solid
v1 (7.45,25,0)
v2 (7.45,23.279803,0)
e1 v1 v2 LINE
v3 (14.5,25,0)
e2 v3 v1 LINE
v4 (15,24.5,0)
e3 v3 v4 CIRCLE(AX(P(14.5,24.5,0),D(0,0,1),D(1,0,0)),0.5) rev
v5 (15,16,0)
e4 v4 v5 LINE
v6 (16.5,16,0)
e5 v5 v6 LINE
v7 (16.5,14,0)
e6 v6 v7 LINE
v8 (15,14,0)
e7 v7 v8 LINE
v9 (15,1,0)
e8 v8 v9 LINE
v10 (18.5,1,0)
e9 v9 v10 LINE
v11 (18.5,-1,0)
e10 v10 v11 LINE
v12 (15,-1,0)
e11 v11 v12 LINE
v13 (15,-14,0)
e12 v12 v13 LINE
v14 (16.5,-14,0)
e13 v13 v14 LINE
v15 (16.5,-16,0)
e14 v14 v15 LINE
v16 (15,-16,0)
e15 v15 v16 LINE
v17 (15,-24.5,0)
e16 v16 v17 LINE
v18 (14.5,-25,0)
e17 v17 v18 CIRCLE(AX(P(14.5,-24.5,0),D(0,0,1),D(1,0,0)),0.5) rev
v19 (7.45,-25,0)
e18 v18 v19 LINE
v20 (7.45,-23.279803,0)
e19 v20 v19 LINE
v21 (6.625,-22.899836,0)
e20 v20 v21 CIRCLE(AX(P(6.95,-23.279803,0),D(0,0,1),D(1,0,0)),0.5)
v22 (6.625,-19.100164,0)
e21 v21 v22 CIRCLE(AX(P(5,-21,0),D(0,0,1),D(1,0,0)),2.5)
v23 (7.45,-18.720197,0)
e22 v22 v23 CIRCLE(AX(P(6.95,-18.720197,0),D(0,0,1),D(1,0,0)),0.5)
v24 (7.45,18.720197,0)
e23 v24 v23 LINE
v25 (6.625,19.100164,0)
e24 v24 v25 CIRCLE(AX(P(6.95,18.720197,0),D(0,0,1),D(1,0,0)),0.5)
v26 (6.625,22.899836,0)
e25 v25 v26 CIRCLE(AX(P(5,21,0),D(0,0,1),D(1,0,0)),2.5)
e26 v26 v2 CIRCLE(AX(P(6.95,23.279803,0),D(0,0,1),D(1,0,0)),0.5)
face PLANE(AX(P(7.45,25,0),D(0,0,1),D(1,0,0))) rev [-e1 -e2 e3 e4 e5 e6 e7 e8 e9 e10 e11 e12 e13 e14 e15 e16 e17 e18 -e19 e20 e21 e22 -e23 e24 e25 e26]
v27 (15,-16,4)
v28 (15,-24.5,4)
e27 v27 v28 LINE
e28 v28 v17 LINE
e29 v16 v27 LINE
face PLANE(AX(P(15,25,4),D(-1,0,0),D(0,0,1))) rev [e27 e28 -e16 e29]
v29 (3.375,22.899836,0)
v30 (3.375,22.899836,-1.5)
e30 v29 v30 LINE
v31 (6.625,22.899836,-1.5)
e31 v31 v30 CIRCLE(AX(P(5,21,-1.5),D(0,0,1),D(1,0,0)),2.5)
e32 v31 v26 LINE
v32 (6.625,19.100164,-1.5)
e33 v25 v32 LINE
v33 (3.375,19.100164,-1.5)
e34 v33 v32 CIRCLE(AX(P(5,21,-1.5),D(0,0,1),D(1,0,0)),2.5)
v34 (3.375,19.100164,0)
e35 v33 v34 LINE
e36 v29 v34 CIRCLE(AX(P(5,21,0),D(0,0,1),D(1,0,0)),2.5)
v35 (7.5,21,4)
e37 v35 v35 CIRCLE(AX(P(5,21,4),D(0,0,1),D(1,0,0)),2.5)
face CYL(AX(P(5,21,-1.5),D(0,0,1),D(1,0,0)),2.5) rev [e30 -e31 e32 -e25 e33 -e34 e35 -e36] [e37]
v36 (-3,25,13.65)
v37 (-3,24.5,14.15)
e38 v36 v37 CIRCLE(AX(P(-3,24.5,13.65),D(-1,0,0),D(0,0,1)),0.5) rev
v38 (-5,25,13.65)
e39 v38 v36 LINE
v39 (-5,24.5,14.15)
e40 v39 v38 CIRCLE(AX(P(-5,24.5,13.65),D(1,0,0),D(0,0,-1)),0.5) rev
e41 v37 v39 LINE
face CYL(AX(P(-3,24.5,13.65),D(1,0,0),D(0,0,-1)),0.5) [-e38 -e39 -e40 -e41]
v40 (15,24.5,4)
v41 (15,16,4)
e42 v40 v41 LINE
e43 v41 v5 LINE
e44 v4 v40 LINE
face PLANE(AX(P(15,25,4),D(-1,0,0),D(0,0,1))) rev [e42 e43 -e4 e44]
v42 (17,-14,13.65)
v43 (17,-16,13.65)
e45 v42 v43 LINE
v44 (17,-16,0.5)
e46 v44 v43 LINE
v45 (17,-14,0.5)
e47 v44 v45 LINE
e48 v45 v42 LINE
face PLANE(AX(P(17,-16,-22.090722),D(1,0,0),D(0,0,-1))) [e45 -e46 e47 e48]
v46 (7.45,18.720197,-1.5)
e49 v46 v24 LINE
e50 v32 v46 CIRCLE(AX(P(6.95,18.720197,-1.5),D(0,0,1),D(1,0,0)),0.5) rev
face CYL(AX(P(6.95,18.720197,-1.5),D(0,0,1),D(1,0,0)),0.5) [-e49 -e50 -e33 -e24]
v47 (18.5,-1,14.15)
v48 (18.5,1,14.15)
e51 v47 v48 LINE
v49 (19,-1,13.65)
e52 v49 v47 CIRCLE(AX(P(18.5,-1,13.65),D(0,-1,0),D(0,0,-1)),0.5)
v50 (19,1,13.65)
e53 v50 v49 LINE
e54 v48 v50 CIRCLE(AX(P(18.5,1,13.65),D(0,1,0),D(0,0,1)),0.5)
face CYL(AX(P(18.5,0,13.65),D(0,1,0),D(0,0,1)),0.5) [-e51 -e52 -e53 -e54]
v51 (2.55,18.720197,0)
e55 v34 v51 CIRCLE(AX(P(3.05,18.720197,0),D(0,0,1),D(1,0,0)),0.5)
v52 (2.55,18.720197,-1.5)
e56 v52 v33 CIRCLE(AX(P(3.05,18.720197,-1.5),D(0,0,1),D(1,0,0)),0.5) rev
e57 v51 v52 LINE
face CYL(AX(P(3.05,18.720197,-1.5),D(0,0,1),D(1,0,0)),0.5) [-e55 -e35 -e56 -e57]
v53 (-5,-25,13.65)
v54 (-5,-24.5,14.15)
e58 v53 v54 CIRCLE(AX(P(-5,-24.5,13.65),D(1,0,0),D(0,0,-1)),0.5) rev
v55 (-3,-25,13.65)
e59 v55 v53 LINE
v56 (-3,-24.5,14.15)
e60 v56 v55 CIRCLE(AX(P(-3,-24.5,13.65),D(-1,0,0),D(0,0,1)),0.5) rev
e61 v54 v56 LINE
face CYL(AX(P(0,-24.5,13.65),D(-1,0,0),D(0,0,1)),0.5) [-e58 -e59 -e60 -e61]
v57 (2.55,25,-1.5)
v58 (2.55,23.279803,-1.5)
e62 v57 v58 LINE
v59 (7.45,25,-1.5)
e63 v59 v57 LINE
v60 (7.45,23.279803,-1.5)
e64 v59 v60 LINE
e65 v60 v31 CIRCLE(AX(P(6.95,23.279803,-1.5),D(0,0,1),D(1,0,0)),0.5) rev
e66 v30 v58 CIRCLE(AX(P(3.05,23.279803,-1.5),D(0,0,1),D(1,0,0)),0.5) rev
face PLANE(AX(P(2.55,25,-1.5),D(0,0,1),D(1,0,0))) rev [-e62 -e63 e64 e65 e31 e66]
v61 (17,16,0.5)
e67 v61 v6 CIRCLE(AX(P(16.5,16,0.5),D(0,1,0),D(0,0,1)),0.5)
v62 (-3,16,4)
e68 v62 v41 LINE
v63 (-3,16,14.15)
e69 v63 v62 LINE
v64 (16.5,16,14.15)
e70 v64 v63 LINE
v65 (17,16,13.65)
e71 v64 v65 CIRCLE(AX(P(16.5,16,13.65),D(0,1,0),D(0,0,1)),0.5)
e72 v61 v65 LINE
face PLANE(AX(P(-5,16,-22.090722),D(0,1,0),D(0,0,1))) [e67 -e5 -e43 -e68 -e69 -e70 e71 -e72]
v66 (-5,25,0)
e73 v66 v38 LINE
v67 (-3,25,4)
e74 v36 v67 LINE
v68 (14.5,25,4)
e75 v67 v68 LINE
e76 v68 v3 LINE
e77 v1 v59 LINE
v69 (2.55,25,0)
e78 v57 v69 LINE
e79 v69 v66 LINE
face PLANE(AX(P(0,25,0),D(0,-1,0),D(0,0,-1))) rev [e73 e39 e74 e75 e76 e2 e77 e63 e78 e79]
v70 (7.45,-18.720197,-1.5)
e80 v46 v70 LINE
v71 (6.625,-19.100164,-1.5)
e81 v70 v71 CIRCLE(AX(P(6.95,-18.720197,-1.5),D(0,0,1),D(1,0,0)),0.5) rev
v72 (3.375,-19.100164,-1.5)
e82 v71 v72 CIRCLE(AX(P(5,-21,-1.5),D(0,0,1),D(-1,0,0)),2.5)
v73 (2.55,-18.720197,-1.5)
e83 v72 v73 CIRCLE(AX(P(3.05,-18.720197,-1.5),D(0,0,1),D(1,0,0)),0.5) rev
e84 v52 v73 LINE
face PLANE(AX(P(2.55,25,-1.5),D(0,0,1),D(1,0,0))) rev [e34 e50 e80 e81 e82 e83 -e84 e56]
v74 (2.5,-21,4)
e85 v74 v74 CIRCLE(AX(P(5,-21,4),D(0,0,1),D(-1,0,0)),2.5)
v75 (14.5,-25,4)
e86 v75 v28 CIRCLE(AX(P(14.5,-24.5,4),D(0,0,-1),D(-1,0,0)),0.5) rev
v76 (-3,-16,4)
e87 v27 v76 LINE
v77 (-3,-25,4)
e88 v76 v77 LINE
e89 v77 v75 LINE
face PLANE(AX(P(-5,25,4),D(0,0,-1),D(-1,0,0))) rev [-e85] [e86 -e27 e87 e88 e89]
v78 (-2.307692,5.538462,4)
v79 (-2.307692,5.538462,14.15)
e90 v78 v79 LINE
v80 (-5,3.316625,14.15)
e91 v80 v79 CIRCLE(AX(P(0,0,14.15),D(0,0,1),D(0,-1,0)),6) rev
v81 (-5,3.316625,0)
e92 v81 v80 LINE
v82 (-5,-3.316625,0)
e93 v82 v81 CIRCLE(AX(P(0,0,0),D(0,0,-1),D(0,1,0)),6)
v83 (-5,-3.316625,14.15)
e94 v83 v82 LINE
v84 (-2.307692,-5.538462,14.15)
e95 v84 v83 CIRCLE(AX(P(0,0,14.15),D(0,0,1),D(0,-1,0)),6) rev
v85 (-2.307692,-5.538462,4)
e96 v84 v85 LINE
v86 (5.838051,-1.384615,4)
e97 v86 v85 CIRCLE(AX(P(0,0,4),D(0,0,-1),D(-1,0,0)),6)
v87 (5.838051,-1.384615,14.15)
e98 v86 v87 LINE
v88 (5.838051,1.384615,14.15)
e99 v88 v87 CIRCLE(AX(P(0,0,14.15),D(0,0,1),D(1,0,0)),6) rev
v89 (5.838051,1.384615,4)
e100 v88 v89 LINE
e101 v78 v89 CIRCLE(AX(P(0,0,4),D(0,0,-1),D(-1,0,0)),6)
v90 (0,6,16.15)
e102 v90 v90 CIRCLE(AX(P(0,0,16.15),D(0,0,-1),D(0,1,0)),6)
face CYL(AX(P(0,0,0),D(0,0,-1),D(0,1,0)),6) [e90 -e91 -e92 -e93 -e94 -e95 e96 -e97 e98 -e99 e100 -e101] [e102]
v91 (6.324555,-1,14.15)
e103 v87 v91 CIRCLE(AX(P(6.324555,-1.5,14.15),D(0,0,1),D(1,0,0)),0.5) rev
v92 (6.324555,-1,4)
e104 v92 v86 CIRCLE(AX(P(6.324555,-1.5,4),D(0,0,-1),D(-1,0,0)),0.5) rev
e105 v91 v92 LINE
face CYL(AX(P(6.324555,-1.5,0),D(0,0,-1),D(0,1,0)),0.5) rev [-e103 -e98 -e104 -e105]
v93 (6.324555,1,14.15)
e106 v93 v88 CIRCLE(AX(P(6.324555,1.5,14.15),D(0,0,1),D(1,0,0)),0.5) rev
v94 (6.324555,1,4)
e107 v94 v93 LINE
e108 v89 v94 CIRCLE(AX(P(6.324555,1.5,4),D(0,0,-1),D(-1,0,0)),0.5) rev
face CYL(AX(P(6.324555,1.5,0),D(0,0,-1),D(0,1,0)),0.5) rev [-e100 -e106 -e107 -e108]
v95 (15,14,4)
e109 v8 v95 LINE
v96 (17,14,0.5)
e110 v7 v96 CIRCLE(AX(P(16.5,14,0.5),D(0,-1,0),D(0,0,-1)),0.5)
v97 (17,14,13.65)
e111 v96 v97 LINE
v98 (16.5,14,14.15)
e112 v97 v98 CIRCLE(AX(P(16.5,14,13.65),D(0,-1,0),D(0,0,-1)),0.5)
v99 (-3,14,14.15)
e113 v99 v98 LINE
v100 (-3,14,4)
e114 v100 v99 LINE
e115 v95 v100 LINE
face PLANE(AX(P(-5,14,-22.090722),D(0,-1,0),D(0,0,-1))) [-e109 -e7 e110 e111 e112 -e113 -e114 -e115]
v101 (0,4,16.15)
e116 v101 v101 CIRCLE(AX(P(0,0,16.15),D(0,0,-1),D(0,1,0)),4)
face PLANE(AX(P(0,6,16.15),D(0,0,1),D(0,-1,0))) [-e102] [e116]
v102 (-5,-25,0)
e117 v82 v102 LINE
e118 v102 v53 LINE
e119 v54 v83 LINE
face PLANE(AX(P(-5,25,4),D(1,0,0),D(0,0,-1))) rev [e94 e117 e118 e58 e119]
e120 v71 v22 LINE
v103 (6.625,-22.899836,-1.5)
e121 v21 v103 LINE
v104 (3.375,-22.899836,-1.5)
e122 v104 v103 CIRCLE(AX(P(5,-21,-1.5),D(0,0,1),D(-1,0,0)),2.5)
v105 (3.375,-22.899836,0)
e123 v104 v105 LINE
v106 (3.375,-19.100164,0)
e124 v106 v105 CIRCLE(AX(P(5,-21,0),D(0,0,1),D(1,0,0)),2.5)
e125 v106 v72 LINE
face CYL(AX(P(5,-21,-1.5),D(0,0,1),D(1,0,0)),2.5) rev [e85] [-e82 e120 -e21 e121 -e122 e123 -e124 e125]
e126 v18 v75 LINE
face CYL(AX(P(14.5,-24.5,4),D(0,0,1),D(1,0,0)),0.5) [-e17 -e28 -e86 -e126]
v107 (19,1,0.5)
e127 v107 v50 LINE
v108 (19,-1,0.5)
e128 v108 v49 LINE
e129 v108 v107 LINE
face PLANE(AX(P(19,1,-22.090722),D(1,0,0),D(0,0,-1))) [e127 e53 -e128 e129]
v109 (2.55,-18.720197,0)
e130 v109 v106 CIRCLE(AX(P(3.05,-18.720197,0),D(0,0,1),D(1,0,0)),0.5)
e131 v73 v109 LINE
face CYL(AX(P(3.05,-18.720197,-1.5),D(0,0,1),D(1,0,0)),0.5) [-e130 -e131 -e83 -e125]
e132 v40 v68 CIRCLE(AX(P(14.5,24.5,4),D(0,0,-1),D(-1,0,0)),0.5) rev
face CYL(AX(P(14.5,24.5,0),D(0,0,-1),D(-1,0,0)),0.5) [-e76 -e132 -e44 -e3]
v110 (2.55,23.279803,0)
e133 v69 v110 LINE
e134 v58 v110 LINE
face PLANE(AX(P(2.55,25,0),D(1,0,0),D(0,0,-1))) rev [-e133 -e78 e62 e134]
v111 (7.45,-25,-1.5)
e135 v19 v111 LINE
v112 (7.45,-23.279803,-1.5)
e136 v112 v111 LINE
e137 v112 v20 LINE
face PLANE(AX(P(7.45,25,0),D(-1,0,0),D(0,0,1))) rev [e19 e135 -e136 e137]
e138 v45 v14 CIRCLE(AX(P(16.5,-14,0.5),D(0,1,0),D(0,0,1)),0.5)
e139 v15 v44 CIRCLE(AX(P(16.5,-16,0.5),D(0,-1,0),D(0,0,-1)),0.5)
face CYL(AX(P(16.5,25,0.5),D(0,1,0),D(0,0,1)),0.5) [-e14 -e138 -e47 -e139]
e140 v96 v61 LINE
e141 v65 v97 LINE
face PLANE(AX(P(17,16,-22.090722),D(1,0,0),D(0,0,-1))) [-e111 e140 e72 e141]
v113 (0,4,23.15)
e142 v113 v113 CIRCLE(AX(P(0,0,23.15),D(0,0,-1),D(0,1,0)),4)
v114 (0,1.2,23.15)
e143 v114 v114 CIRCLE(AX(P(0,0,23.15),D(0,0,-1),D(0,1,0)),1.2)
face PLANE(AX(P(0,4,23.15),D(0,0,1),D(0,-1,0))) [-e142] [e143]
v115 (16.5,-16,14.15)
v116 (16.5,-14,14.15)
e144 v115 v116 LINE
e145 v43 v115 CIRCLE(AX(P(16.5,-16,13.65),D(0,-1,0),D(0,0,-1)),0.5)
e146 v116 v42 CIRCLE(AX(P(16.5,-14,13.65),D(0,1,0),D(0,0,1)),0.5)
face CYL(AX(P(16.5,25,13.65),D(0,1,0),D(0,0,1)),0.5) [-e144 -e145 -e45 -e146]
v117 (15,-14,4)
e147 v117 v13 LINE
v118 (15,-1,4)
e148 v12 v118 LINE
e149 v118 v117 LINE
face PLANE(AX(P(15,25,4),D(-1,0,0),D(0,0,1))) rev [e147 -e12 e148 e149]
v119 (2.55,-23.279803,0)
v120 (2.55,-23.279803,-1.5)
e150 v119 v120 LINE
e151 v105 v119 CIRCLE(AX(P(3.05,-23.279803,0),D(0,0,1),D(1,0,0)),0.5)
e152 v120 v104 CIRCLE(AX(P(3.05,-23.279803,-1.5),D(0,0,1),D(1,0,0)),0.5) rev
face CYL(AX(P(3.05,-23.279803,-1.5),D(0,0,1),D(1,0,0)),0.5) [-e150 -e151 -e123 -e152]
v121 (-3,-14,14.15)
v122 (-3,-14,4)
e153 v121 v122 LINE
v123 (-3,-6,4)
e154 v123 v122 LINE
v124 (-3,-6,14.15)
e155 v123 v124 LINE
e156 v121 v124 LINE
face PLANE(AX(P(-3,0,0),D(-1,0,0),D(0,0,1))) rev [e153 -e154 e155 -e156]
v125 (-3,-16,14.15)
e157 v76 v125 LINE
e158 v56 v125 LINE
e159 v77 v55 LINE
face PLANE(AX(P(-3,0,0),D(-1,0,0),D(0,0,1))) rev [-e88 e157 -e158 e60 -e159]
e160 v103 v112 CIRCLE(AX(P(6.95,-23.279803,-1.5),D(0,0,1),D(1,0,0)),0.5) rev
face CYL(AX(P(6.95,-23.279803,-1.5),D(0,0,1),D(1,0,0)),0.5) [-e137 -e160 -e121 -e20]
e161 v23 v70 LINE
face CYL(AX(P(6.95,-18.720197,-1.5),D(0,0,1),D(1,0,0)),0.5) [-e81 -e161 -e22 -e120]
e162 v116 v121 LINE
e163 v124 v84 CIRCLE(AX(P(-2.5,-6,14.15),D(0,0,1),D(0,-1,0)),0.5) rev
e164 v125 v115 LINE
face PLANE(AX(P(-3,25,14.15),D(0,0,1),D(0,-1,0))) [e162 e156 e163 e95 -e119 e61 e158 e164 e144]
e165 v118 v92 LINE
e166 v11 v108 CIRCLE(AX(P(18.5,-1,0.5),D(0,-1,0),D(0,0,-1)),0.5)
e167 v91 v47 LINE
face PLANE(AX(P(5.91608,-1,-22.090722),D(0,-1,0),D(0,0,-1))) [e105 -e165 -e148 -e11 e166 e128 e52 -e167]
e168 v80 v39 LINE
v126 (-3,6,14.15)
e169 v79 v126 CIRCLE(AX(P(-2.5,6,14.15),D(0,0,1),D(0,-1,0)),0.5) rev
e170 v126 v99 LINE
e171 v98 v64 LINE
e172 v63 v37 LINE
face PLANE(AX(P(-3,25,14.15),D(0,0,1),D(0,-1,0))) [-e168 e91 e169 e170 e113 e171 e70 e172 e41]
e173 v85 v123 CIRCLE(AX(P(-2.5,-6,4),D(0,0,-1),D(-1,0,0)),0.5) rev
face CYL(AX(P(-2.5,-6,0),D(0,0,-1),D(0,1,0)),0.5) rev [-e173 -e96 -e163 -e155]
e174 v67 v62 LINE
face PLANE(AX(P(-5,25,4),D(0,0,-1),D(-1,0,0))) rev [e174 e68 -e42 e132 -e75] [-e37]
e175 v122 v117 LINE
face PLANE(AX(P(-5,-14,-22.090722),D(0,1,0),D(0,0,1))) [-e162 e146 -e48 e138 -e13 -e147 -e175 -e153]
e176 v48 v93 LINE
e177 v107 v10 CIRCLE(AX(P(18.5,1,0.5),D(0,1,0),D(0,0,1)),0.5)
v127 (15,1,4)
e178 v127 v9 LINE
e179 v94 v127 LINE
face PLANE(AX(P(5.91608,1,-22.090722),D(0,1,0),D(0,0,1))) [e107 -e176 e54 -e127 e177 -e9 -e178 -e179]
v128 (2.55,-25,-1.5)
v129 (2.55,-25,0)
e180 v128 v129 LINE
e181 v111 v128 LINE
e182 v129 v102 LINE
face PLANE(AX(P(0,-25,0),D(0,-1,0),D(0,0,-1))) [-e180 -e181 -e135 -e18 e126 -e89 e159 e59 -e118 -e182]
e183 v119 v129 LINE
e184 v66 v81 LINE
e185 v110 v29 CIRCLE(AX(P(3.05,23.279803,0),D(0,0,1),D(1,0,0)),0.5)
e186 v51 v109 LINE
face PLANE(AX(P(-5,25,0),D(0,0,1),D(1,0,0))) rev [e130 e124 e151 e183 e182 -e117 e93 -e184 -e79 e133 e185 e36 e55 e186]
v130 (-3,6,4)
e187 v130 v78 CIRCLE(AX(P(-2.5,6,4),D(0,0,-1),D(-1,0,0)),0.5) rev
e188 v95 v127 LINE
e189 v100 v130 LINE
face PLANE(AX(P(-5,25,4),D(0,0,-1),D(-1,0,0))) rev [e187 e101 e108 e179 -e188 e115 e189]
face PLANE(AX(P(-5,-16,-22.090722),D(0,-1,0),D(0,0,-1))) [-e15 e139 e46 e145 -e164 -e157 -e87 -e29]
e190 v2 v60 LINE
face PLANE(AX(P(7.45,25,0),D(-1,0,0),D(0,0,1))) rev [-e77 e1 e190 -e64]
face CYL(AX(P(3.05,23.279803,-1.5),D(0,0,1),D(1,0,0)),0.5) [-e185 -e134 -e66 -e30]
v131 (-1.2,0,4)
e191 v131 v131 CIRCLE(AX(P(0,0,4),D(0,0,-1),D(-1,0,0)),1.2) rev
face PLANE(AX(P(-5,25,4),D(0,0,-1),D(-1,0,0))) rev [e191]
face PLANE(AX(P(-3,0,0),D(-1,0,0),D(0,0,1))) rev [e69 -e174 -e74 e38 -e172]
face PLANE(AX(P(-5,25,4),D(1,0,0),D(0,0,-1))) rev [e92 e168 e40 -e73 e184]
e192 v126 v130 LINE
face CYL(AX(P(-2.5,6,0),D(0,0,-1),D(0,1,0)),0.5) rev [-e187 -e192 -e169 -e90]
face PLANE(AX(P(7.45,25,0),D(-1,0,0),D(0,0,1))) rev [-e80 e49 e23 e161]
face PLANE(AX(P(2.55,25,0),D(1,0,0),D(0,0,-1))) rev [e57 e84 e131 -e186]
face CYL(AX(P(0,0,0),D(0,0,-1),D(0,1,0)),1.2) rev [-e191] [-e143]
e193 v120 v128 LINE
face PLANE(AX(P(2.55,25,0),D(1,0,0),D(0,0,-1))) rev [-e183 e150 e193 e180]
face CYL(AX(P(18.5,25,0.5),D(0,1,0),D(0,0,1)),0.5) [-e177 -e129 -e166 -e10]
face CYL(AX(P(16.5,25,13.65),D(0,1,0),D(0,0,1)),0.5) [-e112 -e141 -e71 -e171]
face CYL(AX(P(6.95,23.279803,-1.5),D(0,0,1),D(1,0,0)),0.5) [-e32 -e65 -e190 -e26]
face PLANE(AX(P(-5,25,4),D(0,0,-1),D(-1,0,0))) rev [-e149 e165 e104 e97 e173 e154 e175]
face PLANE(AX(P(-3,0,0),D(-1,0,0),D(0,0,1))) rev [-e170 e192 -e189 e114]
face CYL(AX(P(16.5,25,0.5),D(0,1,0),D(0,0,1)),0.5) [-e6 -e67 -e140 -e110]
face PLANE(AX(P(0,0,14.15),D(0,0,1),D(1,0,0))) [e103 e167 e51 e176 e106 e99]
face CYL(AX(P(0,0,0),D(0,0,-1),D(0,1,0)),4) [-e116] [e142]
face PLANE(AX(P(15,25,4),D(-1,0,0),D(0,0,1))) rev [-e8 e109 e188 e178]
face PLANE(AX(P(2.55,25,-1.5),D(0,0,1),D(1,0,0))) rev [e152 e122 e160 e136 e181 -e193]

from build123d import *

# Parameters (mm, degrees)
BOSS_EXTRU_1_DEPTH      = 25
ESQUISSE5_W             = 10.15
ESQUISSE5_H             = 50
BOSS_EXTRU_2_DEPTH      = 2
BOSS_EXTRU_3_REACH      = 35.09
ESQUISSE6_W             = 22
ESQUISSE6_H             = 2
ESQUISSE6_W_2           = 13.083920217
ESQUISSE7_R             = 2.5
ENL_V_MAT_EXTRU_1_DEPTH = 37.779376014
CONG_1_R                = 0.5


with BuildPart() as part:
    # Esquisse1 → Boss.-Extru.1 (new, symmetric)
    with BuildSketch(Plane(origin=(0, 0, 0), x_dir=(1, 0, 0), z_dir=(0, 1, 0))):
        Polygon((7.45, 0), (15, 0), (15, -4), (-5, -4), (-5, 0), (2.55, 0), (2.55, 1.5), (7.45, 1.5), align=None)
    extrude(amount=BOSS_EXTRU_1_DEPTH, both=True)

    # Esquisse3 → Révolution1 (revolve)
    with BuildSketch(Plane(origin=(0, 0, 0), x_dir=(0, 0, -1), z_dir=(1, 0, 0))):
        Polygon((0, 6), (-16.15, 6), (-16.15, 4), (-23.15, 4), (-23.15, 1.2), (0, 1.2), align=None)
    revolve(axis=Axis((0, 0, 0), (0, 0, 1)))

    # Esquisse5 → Boss.-Extru.2 (add)
    with BuildSketch(Plane.ZY.offset(5)):
        with Locations((9.075, 0)):
            Rectangle(ESQUISSE5_W, ESQUISSE5_H)
    extrude(amount=-BOSS_EXTRU_2_DEPTH)

    # Boss.-Extru.3: up to this face of the body (flat: up to its plane)
    boss_extru_3_end = Plane(part.part.faces().sort_by_distance((11.225, 0, 0))[0])
    # Esquisse6 → Boss.-Extru.3 (add, up to the picked face)
    with BuildSketch(Plane.XY.offset(14.15), mode=Mode.PRIVATE) as boss_extru_3_sk1:
        with Locations((6, 15)):
            Rectangle(ESQUISSE6_W, ESQUISSE6_H)
    boss_extru_3_tool1 = split(extrude(boss_extru_3_sk1.sketch, amount=-BOSS_EXTRU_3_REACH, mode=Mode.PRIVATE), bisect_by=boss_extru_3_end, keep=Keep.BOTH, mode=Mode.PRIVATE)
    # Esquisse6 → Boss.-Extru.3 (add, up to the picked face)
    with BuildSketch(Plane.XY.offset(14.15), mode=Mode.PRIVATE) as boss_extru_3_sk2:
        with Locations((6, -15)):
            Rectangle(ESQUISSE6_W, ESQUISSE6_H)
    boss_extru_3_tool2 = split(extrude(boss_extru_3_sk2.sketch, amount=-BOSS_EXTRU_3_REACH, mode=Mode.PRIVATE), bisect_by=boss_extru_3_end, keep=Keep.BOTH, mode=Mode.PRIVATE)
    # Esquisse6 → Boss.-Extru.3 (add, up to the picked face)
    with BuildSketch(Plane.XY.offset(14.15), mode=Mode.PRIVATE) as boss_extru_3_sk3:
        with Locations((12.458039892, 0)):
            Rectangle(ESQUISSE6_W_2, ESQUISSE6_H)
    boss_extru_3_tool3 = split(extrude(boss_extru_3_sk3.sketch, amount=-BOSS_EXTRU_3_REACH, mode=Mode.PRIVATE), bisect_by=boss_extru_3_end, keep=Keep.BOTH, mode=Mode.PRIVATE)
    add(boss_extru_3_tool1.solids().sort_by(Axis((6, 15, 14.15), (0, 0, -1)))[0])
    add(boss_extru_3_tool2.solids().sort_by(Axis((6, -15, 14.15), (0, 0, -1)))[0])
    add(boss_extru_3_tool3.solids().sort_by(Axis((12.45804, 0, 14.15), (0, 0, -1)))[0])

    # Esquisse7 → Enlèv. mat.-Extru.1 (cut, through all)
    with BuildSketch(Plane.XY.offset(4)):
        with Locations((5, 21)):
            Circle(ESQUISSE7_R)
        with Locations(Location((5, -21, 0), (0, 0, 348.521659045))):
            Circle(ESQUISSE7_R)
    extrude(amount=-ENL_V_MAT_EXTRU_1_DEPTH, mode=Mode.SUBTRACT)

    # Congé1
    # the kernel refuses this fillet: 0.5 mm, written as the material it adds along each edge
    with BuildSketch(Plane(origin=(5.916079783, 1, 14.15), x_dir=(1, 0, 0), z_dir=(0, 0, -1))) as cong_1_piece_1:
        with BuildLine():
            CenterArc((0.408475537, -0.5), CONG_1_R, 90, 76.657636203)
            ThreePointArc((-0.078028718, -0.384615385), (-0.035868882, -0.19294583), (0, 0))
            Line((0, 0), (0.408475537, 0))
        make_face()
    extrude(amount=11.171188843)
    with BuildSketch(Plane(origin=(5.916079783, -1, 14.15), x_dir=(1, 0, 0), z_dir=(0, 0, -1))) as cong_1_piece_2:
        with BuildLine():
            CenterArc((0.408475537, 0.5), CONG_1_R, 193.342363797, 76.657636203)
            ThreePointArc((-0.078028718, 0.384615385), (-0.035868882, 0.19294583), (0, 0))
            Line((0, 0), (0.408475537, 0))
        make_face()
    extrude(amount=11.171188843)
    with BuildSketch(Plane(origin=(-3, -5.196152423, 1.990381057), x_dir=(0.8964096085841841, -0.44322659401027603, 0), z_dir=(0, 0, 1))) as cong_1_piece_3:
        with BuildLine():
            CenterArc((0.804491428, -0.498963395), CONG_1_R, 93.690067526, 112.619864948)
            Line((0.356286624, -0.720576692), (0, 0))
            ThreePointArc((0, 0), (0.386155885, -0.012439259), (0.772311771, 0))
        make_face()
    extrude(amount=12.159618943)
    with BuildSketch(Plane(origin=(-3, 5.196152423, 1.990381057), x_dir=(0, 1, 0), z_dir=(0, 0, 1))) as cong_1_piece_4:
        with BuildLine():
            CenterArc((0.803847577, -0.5), CONG_1_R, 90, 112.619864948)
            ThreePointArc((0.342309116, -0.692307692), (0.182305229, -0.340640436), (0, 0))
            Line((0, 0), (0.803847577, 0))
        make_face()
    extrude(amount=12.159618943)
    # the kernel refuses this fillet: 0.5 mm, written as the material it takes off along each edge
    with BuildSketch(Plane(origin=(15, 25, -1.25), x_dir=(0, -1, 0), z_dir=(0, 0, 1)), Plane(origin=(15, -25, -1.25), x_dir=(-1, 0, 0), z_dir=(0, 0, 1))) as cong_1_2_piece_1:
        with BuildLine():
            CenterArc((CONG_1_R, -CONG_1_R), CONG_1_R, 90, 90)
            Line((0, -CONG_1_R), (0, 0))
            Line((0, 0), (CONG_1_R, 0))
        make_face()
    extrude(amount=6.5, mode=Mode.SUBTRACT)
    with BuildSketch(Plane(origin=(17, -17.25, 0), x_dir=(-1, 0, 0), z_dir=(0, 1, 0)), Plane(origin=(19, 2.25, 14.15), x_dir=(-1, 0, 0), z_dir=(0, -1, 0)), Plane(origin=(-6.25, 25, 14.15), x_dir=(0, -1, 0), z_dir=(1, 0, 0)), Plane(origin=(-6.25, -25, 14.15), x_dir=(0, 0, -1), z_dir=(1, 0, 0)), Plane(origin=(17, 17.25, 14.15), x_dir=(-1, 0, 0), z_dir=(0, -1, 0))) as cong_1_2_piece_2:
        with BuildLine():
            CenterArc((CONG_1_R, CONG_1_R), CONG_1_R, 180, 90)
            Line((0, CONG_1_R), (0, 0))
            Line((0, 0), (CONG_1_R, 0))
        make_face()
    extrude(amount=4.5, mode=Mode.SUBTRACT)
    with BuildSketch(Plane(origin=(17, -17.25, 14.15), x_dir=(-1, 0, 0), z_dir=(0, 1, 0)), Plane(origin=(19, 2.25, 0), x_dir=(-1, 0, 0), z_dir=(0, -1, 0)), Plane(origin=(17, 17.25, 0), x_dir=(-1, 0, 0), z_dir=(0, -1, 0))) as cong_1_2_piece_3:
        with BuildLine():
            CenterArc((CONG_1_R, -CONG_1_R), CONG_1_R, 90, 90)
            Line((0, -CONG_1_R), (0, 0))
            Line((0, 0), (CONG_1_R, 0))
        make_face()
    extrude(amount=4.5, mode=Mode.SUBTRACT)
    with BuildSketch(Plane(origin=(7.45, 20.502506281, -5.955772261), x_dir=(-0.5070626183882774, -0.8619092185568178, 0), z_dir=(0, 0, 1))) as cong_1_2_piece_4:
        with BuildLine():
            CenterArc((1.789719784, 0.472787611), CONG_1_R, 120.468369541, 130.541601874)
            Line((1.536188475, 0.90374222), (0, 0))
            ThreePointArc((0, 0), (0.813508993, 0.136061947), (1.627017986, 0))
        make_face()
    extrude(amount=5.955772261, mode=Mode.SUBTRACT)
    with BuildSketch(Plane(origin=(7.45, 21.497493719, -5.955772261), x_dir=(0, 1, 0), z_dir=(0, 0, 1)), Plane(origin=(2.55, 20.502506281, -5.955772261), x_dir=(0, -1, 0), z_dir=(0, 0, 1)), Plane(origin=(7.45, -20.502506281, -5.955772261), x_dir=(0, 1, 0), z_dir=(0, 0, 1)), Plane(origin=(2.55, -21.497493719, -5.955772261), x_dir=(0, -1, 0), z_dir=(0, 0, 1))) as cong_1_2_piece_5:
        with BuildLine():
            CenterArc((1.782308904, 0.5), CONG_1_R, 139.458398126, 130.541601874)
            ThreePointArc((1.402341801, 0.825), (0.770162827, 0.295226954), (0, 0))
            Line((0, 0), (1.782308904, 0))
        make_face()
    extrude(amount=5.955772261, mode=Mode.SUBTRACT)
    with BuildSketch(Plane(origin=(2.55, 21.497493719, -5.955772261), x_dir=(0, 1, 0), z_dir=(0, 0, 1)), Plane(origin=(2.55, -20.502506281, -5.955772261), x_dir=(0, 1, 0), z_dir=(0, 0, 1))) as cong_1_2_piece_6:
        with BuildLine():
            CenterArc((1.782308904, -0.5), CONG_1_R, 90, 130.541601874)
            ThreePointArc((1.402341801, -0.825), (0.770162827, -0.295226954), (0, 0))
            Line((0, 0), (1.782308904, 0))
        make_face()
    extrude(amount=5.955772261, mode=Mode.SUBTRACT)
    with BuildSketch(Plane(origin=(7.45, -21.497493719, 0), x_dir=(-0.507062618391788, -0.8619092185547524, 0), z_dir=(0, 0, -1))) as cong_1_2_piece_7:
        with BuildLine():
            CenterArc((1.789719784, -0.472787611), CONG_1_R, 108.990028586, 130.541601874)
            Line((1.536188475, -0.90374222), (0, 0))
            ThreePointArc((0, 0), (0.813508993, -0.136061947), (1.627017986, 0))
        make_face()
    extrude(amount=5.955772261, mode=Mode.SUBTRACT)


solid = part.part
